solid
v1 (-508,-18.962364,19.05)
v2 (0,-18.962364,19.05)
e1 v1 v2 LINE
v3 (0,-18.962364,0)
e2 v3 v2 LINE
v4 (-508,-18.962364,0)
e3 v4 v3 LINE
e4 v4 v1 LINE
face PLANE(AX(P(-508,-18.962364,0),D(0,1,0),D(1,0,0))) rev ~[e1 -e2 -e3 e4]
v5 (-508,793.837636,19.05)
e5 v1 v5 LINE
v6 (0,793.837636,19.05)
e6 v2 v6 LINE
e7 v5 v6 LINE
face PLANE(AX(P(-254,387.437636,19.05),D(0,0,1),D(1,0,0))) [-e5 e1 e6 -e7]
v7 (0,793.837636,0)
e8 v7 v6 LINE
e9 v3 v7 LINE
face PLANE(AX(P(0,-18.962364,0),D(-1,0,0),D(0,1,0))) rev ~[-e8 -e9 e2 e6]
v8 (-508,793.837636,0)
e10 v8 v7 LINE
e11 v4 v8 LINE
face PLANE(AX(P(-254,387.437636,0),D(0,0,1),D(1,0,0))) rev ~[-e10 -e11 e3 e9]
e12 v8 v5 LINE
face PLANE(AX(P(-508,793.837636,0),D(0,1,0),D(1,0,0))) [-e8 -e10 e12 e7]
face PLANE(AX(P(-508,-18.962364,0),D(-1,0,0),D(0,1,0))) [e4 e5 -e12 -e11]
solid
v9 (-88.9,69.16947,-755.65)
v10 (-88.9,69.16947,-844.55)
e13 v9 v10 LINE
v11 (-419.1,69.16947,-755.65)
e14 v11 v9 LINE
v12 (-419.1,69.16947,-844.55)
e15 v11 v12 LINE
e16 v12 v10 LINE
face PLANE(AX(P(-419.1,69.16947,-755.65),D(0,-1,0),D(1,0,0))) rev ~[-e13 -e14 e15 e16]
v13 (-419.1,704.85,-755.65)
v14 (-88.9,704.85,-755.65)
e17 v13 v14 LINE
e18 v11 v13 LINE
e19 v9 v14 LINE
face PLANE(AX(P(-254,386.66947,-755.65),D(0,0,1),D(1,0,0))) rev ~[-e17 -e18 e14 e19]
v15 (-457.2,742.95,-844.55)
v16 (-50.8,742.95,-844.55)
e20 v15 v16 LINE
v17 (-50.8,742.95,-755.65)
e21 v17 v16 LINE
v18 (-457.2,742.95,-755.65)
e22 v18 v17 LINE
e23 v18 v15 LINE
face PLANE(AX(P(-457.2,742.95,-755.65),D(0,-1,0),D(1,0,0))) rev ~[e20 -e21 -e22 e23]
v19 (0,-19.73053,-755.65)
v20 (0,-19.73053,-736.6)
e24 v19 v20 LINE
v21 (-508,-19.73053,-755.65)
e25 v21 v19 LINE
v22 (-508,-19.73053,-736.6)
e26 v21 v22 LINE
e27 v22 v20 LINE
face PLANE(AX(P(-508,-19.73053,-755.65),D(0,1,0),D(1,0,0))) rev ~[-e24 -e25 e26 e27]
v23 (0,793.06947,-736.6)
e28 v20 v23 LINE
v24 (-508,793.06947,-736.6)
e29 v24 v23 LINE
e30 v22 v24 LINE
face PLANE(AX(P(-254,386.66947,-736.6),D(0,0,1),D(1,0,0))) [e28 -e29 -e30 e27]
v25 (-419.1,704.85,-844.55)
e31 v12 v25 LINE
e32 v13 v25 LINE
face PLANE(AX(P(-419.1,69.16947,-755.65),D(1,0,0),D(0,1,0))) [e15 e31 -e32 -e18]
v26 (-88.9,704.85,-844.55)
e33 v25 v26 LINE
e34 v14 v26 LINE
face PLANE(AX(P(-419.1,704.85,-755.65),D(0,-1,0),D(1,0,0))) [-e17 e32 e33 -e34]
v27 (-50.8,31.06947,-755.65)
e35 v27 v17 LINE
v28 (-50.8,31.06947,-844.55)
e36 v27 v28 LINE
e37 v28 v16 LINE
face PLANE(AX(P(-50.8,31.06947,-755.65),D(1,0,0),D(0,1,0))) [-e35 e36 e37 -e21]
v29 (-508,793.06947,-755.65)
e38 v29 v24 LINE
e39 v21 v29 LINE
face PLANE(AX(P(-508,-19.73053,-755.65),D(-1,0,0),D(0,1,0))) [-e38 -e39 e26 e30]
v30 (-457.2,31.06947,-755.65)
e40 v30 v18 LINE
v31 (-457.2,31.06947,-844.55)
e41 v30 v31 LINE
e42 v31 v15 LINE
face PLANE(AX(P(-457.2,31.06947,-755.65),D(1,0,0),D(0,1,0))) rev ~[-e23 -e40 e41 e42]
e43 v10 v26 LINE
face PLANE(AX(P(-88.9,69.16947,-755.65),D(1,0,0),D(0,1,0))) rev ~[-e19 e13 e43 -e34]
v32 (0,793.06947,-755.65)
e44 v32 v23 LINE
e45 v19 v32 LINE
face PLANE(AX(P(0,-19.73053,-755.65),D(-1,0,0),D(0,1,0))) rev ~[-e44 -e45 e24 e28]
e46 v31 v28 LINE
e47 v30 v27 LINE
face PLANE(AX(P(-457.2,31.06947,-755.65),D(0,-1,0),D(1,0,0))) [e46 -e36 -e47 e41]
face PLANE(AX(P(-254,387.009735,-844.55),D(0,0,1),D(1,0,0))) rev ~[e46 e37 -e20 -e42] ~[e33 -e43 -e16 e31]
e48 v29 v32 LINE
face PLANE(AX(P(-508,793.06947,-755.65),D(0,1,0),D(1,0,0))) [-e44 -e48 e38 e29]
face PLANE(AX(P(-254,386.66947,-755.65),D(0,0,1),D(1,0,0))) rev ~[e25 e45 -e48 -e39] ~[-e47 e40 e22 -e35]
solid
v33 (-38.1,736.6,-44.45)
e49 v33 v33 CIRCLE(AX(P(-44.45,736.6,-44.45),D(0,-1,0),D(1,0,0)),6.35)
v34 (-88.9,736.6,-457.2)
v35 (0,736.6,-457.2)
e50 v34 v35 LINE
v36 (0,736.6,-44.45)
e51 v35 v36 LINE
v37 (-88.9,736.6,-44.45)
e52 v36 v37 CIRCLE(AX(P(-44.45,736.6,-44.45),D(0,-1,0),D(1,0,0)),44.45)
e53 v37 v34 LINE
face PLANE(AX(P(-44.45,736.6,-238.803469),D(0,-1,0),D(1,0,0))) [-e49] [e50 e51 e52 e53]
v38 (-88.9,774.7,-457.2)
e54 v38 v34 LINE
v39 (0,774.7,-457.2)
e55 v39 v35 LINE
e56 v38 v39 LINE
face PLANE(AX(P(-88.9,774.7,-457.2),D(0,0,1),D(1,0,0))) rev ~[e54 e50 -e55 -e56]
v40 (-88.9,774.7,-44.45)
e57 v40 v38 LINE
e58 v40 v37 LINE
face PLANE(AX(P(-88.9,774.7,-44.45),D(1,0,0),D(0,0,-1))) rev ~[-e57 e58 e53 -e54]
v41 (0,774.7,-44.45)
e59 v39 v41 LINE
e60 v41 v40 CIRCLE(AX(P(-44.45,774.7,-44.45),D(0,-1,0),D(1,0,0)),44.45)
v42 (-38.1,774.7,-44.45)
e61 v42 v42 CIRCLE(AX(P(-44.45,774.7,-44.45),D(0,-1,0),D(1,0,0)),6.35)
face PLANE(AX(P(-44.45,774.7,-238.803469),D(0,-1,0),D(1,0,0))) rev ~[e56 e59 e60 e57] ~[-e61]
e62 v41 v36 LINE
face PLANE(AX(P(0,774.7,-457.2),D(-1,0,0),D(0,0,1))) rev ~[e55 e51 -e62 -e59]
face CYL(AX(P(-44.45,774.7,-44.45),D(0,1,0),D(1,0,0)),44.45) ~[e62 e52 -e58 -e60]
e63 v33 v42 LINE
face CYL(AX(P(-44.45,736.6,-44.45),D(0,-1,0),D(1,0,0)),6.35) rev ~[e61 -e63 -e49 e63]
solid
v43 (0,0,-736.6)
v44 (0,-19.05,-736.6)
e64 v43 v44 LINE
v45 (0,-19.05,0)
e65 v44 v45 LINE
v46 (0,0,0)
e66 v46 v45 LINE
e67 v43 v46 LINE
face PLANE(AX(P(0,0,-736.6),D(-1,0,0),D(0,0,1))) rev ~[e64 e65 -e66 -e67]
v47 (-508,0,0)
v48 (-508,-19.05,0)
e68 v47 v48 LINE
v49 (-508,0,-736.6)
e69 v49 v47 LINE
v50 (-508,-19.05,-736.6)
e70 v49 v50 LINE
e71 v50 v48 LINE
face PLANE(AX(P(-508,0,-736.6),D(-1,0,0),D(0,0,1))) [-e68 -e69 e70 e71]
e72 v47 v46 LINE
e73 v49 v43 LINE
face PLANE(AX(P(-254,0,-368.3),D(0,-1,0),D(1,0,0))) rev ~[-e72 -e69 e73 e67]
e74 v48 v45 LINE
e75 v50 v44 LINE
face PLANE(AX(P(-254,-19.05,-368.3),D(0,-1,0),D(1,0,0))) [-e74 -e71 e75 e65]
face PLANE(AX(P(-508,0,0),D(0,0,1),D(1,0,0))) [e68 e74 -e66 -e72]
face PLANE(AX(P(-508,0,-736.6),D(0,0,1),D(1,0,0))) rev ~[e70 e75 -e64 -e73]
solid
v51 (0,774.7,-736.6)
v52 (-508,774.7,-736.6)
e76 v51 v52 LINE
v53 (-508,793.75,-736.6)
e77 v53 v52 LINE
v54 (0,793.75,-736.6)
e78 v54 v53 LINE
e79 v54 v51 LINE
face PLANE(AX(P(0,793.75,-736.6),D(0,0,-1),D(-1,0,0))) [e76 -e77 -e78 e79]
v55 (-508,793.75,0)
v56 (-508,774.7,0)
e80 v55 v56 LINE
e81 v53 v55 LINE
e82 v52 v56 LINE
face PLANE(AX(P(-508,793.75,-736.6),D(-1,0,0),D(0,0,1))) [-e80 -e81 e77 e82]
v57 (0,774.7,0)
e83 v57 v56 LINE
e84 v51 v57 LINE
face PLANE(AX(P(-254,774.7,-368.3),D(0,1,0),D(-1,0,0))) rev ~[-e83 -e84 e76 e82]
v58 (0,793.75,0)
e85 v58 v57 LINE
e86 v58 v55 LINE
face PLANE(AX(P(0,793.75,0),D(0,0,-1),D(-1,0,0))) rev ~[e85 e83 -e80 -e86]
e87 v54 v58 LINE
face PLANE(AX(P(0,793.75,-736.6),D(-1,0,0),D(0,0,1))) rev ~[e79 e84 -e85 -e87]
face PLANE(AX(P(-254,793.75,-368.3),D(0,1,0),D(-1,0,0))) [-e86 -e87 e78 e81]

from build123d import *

# Parameters (mm, degrees)
F0_W      = 508
F0_H      = 736.6
F1_DEPTH  = 19.05
F4_W      = 508
F4_H      = 736.6
F5_DEPTH  = 19.05
F6_W      = 508
F6_H      = 812.8
F7_DEPTH  = 19.05
F8_W      = 508
F8_H      = 812.8
F9_DEPTH  = 19.05
F10_W     = 406.4
F10_H     = 711.8805297179
F10_W_2   = 330.2
F10_H_2   = 635.6805297179
F11_DEPTH = 88.9
F14_DEPTH = 38.1
F15_R     = 6.35
F16_DEPTH = 57.2386364558


with BuildPart() as f1:
    # F0 (on Front) → F1 (new body)
    with BuildSketch(Plane.XZ):
        with Locations((-254, -368.3)):
            Rectangle(F0_W, F0_H)
    extrude(amount=F1_DEPTH)


with BuildPart() as f5:
    # F4 (on offset) → F5 (new body)
    with BuildSketch(Plane(origin=(0, 793.75, 0), x_dir=(-1, 0, 0), z_dir=(0, 1, 0))):
        with Locations((254, -368.3)):
            Rectangle(F4_W, F4_H)
    extrude(amount=-F5_DEPTH)


with BuildPart() as f7:
    # F6 (on Top) → F7 (new body)
    with BuildSketch(Plane.XY):
        with Locations((-254, 387.4376364558)):
            Rectangle(F6_W, F6_H)
    extrude(amount=F7_DEPTH)


with BuildPart() as f9:
    # F8 (on offset) → F9 (new body)
    with BuildSketch(Plane.XY.offset(-755.65)):
        with Locations((-254, 386.6694702821)):
            Rectangle(F8_W, F8_H)
    extrude(amount=F9_DEPTH)

    # F10 (on offset) → F11 (join)
    with BuildSketch(Plane.XY.offset(-755.65)):
        with Locations((-254, 387.009735141)):
            Rectangle(F10_W, F10_H)
        with Locations((-254, 387.009735141)):
            Rectangle(F10_W_2, F10_H_2, mode=Mode.SUBTRACT)
    extrude(amount=-F11_DEPTH)


with BuildPart() as f14:
    # F13 (on offset) → F14 (new body)
    with BuildSketch(Plane.XZ.offset(-774.7)):
        with BuildLine():
            Line((-88.9, -457.2), (0, -457.2))
            Line((0, -457.2), (0, -44.45))
            ThreePointArc((0, -44.45), (-44.45, 0), (-88.9, -44.45))
            Line((-88.9, -44.45), (-88.9, -457.2))
        make_face()
    extrude(amount=F14_DEPTH)

    # F15 (on face) → F16 (cut, through all)
    with BuildSketch(Plane.XZ.offset(-736.6)):
        with Locations((-44.45, -44.45)):
            Circle(F15_R)
    extrude(amount=-F16_DEPTH, mode=Mode.SUBTRACT)


solid = Compound([f1.part, f5.part, f7.part, f9.part, f14.part])
